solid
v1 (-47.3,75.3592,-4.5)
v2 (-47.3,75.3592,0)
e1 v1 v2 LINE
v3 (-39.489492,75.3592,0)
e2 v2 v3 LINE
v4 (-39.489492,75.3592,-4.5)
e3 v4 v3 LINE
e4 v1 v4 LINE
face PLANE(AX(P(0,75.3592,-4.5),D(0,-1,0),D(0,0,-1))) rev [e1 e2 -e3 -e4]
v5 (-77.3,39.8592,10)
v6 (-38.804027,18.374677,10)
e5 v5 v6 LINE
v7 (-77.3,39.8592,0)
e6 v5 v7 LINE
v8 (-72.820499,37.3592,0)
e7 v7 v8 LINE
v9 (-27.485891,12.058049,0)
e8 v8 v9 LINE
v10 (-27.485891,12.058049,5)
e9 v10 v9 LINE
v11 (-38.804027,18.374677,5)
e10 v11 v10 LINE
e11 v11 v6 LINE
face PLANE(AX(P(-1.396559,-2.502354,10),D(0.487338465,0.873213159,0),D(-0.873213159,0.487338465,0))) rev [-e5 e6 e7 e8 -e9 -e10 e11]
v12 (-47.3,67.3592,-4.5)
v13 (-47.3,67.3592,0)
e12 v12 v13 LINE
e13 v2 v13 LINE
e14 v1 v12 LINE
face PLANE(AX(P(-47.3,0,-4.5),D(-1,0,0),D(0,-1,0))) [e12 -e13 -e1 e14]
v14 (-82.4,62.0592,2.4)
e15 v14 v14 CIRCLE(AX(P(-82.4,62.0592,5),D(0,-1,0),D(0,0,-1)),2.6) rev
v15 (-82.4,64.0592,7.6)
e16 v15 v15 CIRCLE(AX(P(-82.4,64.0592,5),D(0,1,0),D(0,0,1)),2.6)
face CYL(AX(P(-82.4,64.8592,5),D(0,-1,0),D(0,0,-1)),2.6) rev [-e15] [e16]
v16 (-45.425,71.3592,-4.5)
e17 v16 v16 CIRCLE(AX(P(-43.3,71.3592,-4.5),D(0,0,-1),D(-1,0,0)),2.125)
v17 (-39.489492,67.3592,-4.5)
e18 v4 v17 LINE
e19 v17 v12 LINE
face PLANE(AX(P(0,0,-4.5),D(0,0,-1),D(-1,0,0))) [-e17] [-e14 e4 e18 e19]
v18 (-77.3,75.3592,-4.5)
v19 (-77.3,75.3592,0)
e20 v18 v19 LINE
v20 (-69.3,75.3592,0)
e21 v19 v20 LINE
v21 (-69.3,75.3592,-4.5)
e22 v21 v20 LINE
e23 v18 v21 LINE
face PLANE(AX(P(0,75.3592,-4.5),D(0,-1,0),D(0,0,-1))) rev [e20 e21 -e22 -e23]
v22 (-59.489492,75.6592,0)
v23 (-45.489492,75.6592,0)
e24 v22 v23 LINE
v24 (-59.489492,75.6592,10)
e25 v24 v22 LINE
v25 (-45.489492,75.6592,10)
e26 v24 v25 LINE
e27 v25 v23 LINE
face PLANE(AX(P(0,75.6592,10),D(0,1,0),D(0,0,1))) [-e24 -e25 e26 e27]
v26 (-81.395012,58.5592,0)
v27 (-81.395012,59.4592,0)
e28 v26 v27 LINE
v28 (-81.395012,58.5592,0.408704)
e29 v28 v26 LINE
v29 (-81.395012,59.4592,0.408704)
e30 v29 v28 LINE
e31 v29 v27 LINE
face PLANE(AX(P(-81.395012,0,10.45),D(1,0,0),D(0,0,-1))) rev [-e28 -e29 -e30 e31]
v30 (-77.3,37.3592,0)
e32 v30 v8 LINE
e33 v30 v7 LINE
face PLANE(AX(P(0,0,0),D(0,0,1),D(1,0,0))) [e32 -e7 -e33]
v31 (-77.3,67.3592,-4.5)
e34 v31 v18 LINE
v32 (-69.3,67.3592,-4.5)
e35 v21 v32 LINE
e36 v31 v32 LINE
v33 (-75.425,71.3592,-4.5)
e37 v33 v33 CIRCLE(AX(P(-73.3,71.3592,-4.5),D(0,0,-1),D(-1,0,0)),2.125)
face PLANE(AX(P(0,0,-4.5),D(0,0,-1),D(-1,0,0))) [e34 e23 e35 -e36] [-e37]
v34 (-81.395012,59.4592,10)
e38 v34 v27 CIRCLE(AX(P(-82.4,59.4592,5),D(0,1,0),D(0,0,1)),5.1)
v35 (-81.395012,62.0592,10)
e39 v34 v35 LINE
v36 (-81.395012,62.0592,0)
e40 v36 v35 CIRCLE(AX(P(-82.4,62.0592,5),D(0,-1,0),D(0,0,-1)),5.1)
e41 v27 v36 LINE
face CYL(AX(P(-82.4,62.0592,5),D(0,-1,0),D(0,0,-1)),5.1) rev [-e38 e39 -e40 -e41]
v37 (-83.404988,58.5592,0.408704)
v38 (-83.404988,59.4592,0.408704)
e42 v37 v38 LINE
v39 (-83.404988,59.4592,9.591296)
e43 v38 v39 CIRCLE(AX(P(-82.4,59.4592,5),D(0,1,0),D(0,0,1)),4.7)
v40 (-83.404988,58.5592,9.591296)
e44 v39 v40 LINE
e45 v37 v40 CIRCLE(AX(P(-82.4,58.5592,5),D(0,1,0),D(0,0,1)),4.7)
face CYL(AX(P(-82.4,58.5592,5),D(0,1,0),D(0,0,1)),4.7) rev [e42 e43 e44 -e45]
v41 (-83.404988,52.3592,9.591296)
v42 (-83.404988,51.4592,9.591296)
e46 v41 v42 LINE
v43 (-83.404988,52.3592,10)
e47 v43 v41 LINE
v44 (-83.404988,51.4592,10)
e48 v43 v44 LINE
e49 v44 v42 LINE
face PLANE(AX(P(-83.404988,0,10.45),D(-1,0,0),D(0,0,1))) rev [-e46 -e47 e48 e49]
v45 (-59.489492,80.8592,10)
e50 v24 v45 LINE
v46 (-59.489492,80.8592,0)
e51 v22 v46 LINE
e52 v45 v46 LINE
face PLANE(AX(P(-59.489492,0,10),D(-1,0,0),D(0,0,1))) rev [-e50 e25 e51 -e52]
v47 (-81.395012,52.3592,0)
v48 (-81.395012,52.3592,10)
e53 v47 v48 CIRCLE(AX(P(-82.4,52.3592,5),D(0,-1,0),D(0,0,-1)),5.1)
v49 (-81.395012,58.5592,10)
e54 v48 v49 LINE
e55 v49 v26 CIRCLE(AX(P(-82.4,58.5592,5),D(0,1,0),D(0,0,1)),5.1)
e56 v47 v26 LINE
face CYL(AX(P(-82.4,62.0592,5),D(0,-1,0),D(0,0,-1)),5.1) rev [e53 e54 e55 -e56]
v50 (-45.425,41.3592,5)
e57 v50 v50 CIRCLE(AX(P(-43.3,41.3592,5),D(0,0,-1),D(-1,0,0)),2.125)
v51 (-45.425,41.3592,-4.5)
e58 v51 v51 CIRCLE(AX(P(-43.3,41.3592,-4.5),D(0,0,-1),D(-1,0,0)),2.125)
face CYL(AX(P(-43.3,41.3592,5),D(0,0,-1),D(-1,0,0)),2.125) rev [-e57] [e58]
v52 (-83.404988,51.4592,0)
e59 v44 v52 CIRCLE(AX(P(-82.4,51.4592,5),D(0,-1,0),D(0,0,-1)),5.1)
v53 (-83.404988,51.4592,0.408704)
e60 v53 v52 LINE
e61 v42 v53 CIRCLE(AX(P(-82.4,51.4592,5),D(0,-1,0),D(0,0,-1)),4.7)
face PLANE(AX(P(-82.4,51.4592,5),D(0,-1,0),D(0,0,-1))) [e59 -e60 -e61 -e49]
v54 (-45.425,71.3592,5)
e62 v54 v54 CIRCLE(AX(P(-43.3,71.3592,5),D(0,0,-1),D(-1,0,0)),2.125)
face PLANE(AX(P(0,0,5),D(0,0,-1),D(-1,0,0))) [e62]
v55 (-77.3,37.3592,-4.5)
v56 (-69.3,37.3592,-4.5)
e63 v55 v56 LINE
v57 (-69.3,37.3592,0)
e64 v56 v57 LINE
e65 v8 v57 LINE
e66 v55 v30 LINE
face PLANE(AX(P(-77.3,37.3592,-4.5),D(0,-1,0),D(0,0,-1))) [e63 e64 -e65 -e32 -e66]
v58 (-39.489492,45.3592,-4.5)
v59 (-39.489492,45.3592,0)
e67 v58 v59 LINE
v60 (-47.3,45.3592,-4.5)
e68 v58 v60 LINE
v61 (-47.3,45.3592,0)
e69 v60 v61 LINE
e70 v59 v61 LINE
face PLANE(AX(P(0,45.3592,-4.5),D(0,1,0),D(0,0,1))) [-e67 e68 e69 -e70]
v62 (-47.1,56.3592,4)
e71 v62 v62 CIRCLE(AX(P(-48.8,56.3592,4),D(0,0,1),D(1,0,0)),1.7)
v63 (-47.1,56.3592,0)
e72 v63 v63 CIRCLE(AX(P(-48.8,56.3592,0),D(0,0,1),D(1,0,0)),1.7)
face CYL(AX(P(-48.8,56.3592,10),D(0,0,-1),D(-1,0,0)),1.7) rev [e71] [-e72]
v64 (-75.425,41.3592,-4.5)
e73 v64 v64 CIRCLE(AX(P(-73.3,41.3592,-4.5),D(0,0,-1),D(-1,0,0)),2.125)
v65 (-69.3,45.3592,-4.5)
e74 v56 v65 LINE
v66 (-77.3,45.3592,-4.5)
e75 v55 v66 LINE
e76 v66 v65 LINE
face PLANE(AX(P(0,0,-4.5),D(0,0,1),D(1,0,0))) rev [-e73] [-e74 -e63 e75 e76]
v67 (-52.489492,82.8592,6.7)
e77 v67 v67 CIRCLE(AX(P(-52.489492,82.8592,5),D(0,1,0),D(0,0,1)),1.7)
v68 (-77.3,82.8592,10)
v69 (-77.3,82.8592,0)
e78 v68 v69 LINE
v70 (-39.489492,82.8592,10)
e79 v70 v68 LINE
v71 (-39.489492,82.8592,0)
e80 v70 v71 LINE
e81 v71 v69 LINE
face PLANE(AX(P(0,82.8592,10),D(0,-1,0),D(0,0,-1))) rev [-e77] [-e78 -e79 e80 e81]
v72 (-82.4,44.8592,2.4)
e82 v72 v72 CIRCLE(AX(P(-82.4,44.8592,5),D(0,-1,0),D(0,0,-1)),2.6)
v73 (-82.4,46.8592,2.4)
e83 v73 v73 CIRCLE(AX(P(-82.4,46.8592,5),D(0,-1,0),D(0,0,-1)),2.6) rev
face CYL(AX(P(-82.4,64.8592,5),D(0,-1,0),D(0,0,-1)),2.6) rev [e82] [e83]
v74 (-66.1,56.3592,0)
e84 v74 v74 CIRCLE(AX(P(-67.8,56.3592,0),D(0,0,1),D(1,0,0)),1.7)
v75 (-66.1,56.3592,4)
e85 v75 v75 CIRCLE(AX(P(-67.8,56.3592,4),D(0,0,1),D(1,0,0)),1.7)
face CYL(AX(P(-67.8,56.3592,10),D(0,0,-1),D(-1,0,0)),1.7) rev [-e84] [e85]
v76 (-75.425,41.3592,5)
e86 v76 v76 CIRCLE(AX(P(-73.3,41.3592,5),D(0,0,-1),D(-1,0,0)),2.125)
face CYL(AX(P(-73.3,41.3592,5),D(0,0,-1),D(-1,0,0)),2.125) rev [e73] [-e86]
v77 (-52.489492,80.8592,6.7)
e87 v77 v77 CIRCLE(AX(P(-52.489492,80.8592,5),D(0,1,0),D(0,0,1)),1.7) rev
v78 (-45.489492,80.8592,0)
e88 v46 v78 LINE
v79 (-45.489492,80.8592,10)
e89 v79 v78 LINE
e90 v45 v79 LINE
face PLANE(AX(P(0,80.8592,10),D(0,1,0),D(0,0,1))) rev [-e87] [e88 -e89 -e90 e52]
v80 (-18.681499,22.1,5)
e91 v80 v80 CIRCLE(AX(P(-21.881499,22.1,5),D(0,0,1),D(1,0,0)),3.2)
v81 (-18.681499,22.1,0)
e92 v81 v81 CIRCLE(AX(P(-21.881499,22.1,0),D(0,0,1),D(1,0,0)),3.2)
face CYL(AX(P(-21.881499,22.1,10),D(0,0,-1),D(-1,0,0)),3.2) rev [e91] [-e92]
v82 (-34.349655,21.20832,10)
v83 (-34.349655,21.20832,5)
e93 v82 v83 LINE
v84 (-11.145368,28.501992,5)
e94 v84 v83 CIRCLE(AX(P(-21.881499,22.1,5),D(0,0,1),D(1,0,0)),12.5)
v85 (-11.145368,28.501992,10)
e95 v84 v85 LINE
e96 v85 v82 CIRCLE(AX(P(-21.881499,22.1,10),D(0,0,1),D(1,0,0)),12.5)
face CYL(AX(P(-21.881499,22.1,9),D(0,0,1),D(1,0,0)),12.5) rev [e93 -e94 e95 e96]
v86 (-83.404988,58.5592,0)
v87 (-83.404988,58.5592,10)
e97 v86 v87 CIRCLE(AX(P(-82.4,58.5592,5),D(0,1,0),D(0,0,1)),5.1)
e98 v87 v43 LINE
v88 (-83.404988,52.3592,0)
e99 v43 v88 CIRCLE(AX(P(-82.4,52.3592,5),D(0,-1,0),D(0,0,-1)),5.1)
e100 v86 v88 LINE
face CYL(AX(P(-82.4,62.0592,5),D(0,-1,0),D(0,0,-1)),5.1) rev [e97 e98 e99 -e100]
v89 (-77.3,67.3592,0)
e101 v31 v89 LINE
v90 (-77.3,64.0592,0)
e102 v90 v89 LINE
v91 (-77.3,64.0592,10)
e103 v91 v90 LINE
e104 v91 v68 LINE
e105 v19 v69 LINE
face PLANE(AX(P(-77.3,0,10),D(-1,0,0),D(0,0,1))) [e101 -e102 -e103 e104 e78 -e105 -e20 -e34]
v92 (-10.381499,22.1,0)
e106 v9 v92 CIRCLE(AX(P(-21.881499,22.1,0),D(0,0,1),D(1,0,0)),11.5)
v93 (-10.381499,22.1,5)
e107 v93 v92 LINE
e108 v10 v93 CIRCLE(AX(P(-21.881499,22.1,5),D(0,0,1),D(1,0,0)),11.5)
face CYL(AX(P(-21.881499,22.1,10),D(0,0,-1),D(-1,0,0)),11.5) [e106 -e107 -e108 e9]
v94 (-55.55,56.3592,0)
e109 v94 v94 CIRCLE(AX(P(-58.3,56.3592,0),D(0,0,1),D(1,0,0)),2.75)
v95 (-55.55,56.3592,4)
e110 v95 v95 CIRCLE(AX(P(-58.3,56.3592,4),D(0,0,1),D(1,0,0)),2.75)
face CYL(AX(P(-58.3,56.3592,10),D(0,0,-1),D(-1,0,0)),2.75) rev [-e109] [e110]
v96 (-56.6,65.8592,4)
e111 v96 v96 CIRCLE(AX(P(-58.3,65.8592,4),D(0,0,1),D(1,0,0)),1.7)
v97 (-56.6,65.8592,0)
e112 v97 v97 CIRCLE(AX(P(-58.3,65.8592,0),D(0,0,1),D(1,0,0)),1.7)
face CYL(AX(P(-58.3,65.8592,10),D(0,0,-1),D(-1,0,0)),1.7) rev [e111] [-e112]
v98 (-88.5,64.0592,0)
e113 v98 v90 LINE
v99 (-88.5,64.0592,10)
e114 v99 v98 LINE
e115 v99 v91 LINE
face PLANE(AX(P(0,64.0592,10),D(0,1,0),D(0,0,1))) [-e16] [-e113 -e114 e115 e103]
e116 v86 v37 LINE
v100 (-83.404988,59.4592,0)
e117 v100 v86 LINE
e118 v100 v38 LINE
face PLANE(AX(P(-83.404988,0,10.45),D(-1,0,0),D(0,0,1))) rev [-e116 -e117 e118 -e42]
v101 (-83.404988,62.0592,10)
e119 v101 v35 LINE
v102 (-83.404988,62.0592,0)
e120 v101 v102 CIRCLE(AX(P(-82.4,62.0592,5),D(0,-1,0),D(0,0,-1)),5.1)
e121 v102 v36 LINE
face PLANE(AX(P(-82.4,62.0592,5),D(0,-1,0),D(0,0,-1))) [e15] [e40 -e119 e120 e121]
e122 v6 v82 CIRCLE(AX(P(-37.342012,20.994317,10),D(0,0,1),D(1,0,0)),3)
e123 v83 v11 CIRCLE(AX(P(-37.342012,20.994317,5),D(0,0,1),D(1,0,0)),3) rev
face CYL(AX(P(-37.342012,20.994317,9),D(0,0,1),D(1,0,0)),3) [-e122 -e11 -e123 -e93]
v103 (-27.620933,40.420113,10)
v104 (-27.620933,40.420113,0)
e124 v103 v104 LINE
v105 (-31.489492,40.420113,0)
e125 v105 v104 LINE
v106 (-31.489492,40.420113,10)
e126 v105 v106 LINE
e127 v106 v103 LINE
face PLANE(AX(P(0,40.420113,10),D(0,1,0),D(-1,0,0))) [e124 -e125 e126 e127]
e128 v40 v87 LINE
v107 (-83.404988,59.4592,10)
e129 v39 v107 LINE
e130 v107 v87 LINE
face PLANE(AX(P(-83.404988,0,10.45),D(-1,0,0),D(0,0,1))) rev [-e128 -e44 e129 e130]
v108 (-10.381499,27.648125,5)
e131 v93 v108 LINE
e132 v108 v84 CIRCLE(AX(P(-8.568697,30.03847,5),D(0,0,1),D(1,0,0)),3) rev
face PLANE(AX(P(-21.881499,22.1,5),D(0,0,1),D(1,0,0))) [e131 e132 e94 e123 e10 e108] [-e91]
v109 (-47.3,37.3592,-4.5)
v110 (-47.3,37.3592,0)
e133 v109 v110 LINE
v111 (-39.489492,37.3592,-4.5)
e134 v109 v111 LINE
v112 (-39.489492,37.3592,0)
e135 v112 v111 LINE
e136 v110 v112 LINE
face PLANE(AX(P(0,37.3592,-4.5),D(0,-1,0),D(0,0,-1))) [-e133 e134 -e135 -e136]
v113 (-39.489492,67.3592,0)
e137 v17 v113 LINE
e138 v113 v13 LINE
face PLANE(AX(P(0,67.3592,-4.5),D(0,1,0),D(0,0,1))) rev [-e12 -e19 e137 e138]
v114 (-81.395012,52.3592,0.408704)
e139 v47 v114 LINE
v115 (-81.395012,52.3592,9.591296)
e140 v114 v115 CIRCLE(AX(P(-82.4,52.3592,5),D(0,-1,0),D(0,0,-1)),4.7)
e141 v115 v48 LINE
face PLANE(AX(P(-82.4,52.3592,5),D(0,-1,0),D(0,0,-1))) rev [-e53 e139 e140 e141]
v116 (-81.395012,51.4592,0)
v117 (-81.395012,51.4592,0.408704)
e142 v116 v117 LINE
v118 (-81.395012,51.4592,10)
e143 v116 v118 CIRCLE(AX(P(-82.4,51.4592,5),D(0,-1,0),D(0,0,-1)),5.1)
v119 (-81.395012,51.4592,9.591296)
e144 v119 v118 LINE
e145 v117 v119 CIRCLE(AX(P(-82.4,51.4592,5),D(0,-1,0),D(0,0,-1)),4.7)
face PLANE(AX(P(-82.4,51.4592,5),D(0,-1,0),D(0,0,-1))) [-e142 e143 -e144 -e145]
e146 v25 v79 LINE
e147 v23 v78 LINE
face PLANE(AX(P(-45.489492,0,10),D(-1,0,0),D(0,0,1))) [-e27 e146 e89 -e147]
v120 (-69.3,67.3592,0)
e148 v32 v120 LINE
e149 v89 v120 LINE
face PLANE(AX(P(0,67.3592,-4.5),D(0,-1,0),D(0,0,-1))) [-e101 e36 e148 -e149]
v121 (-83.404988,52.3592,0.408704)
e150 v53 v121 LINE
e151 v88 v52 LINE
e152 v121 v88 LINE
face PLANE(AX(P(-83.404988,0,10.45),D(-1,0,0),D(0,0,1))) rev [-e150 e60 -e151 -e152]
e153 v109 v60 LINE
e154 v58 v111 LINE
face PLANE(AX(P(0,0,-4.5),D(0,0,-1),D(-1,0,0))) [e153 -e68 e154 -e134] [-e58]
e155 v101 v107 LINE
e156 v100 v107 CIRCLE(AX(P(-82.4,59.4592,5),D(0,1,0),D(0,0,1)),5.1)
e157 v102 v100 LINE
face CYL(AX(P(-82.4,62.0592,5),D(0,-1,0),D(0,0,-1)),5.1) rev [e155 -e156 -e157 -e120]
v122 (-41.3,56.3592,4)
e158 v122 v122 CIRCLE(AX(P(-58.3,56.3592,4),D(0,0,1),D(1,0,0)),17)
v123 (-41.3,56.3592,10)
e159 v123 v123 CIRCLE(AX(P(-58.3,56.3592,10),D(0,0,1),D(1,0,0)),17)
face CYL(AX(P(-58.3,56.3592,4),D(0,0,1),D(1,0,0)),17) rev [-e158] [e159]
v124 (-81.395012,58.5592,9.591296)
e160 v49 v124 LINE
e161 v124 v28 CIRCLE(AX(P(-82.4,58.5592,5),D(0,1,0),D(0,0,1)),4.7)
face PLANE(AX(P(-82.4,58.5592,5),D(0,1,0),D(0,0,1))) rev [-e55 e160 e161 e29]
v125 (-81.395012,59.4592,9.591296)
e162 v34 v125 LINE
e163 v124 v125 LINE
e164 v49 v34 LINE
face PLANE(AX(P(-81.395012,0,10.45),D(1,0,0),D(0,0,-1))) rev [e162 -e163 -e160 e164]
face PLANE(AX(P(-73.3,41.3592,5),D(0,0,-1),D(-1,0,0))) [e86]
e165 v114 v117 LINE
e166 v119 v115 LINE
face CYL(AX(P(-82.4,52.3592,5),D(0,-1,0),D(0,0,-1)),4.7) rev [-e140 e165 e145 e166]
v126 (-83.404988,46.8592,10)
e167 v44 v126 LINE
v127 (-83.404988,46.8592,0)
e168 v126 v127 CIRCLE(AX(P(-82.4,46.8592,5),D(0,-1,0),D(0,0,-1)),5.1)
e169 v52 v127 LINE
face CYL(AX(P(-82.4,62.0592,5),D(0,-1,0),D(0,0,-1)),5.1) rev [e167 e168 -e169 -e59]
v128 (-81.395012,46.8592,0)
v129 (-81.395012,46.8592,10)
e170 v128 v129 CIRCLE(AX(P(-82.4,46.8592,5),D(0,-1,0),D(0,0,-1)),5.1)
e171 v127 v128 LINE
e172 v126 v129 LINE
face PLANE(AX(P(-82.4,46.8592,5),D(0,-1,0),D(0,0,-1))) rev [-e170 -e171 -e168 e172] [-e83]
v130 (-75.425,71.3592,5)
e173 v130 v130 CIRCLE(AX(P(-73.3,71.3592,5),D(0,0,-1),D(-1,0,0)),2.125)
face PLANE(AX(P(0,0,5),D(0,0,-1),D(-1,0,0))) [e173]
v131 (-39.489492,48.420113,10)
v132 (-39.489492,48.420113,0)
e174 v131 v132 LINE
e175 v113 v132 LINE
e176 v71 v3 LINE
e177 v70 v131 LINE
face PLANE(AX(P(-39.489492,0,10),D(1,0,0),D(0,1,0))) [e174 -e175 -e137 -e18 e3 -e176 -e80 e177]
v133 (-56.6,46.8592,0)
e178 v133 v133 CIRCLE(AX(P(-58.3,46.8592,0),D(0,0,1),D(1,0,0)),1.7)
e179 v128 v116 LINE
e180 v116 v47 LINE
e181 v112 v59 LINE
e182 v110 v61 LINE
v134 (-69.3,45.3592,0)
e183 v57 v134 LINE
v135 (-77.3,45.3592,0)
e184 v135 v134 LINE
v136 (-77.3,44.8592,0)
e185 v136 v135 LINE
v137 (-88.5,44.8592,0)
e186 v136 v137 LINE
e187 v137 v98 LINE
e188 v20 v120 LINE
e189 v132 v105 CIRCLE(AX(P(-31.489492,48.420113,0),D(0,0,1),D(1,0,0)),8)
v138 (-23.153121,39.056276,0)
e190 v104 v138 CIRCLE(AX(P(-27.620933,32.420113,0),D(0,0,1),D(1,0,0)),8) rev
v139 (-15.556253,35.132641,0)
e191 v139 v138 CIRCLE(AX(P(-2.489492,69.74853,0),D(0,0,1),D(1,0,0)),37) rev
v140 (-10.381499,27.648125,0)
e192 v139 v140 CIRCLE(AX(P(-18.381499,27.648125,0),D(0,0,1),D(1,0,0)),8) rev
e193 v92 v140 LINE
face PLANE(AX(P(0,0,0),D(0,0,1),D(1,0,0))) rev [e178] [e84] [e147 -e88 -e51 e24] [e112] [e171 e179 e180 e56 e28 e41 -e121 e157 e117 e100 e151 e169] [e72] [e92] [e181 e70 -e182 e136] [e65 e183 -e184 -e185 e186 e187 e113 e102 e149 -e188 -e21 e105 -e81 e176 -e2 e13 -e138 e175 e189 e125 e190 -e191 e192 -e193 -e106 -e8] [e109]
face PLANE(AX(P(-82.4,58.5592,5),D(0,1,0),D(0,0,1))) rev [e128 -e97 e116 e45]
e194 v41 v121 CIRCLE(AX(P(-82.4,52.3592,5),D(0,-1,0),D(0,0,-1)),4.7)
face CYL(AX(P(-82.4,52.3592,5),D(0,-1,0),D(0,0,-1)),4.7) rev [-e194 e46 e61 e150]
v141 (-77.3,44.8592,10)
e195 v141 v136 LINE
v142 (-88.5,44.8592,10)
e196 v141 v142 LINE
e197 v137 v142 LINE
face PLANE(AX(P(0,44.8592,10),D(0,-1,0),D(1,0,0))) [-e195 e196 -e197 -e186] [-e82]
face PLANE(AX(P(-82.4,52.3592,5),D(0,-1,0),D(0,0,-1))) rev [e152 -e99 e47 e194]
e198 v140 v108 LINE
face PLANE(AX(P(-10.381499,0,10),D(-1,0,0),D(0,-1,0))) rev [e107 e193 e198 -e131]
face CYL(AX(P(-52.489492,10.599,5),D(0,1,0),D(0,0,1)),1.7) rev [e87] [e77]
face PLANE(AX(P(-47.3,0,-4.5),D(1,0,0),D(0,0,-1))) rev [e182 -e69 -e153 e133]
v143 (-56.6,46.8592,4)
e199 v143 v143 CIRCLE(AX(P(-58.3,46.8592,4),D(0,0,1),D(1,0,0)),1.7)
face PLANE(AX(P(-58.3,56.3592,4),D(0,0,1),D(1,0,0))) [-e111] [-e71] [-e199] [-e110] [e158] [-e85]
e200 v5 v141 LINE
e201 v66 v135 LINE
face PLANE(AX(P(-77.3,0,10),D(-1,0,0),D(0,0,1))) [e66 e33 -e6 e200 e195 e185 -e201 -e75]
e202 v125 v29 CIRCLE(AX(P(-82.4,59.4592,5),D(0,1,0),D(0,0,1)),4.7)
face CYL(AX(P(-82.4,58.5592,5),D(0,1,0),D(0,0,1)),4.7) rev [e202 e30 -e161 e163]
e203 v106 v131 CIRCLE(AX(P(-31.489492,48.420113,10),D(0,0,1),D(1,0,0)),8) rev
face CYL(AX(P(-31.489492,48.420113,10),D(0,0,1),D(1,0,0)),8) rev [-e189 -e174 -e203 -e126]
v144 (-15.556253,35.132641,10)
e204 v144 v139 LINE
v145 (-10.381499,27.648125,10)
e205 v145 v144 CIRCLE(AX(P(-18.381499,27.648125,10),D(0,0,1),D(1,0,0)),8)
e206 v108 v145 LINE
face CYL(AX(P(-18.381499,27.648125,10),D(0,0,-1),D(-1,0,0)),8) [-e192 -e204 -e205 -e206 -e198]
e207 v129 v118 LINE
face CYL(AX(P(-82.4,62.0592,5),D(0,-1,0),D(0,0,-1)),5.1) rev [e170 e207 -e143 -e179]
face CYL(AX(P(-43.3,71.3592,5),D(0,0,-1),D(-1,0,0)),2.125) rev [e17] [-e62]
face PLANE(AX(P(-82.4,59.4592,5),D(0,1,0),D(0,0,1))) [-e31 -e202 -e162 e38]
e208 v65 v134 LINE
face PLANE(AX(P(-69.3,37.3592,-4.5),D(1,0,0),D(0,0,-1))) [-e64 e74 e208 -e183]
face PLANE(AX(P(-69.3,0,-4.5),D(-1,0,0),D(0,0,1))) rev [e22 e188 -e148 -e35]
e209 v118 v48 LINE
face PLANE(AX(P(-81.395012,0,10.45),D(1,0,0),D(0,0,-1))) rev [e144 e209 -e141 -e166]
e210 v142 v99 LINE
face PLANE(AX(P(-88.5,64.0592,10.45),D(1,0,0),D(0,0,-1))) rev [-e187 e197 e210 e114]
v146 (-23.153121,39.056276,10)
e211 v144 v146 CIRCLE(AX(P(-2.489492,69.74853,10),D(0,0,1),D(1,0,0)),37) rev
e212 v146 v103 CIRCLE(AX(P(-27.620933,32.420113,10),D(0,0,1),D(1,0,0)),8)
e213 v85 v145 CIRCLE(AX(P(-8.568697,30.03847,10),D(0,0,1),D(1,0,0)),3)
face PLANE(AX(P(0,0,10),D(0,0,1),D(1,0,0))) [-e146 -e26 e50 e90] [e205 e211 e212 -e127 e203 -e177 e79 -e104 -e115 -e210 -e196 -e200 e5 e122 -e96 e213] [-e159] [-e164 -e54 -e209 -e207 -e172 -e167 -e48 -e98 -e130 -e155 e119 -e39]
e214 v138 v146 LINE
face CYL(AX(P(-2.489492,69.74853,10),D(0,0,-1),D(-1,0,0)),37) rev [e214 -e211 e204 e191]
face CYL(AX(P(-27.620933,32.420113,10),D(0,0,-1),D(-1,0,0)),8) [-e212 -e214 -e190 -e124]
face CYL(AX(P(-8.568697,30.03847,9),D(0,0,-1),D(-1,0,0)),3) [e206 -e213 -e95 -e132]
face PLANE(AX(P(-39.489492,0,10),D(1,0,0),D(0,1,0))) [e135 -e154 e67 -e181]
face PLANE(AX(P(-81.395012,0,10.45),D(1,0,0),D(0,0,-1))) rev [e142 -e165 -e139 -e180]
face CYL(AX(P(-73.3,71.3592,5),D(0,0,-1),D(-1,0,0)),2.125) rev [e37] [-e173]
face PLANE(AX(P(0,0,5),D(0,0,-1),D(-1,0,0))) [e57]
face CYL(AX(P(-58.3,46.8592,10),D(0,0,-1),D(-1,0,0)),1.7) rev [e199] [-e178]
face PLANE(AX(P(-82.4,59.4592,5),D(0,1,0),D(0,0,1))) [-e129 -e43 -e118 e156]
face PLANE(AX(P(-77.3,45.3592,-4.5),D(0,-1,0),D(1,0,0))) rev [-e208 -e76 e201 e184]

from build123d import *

# Parameters (mm, degrees)
SKETCH1_W                 = 5.2
SKETCH1_H                 = 14
SKETCH1_R                 = 3.2
SKETCH1_R_2               = 1.7
SKETCH1_R_3               = 2.75
BOSS_EXTRUDE1_DEPTH       = 10
SKETCH2_R                 = 2.6
CUT_EXTRUDE1_DEPTH        = 20
SKETCH3_R                 = 5.1
CUT_EXTRUDE2_DEPTH        = 15.2
BOSS_EXTRUDE2_DEPTH       = 0.45
BOSS_EXTRUDE2_DEPTH_BACK  = 0.45
SKETCH4_R                 = 5.1
SKETCH4_R_2               = 4.7
BOSS_EXTRUDE3_DEPTH       = 0.45
BOSS_EXTRUDE3_DEPTH_BACK  = 0.45
SKETCH5_R                 = 5.1
SKETCH5_R_2               = 4.7
CUT_EXTRUDE3_START        = -11
CUT_EXTRUDE3_OUTLINE_W    = 2.009975124
CUT_EXTRUDE3_OUTLINE_H    = 0.9
CUT_EXTRUDE3_OUTLINE_W_2  = 3
CUT_EXTRUDE3_OUTLINE_H_2  = 19.2
CUT_EXTRUDE3_DEPTH        = 12
SKETCH7_R                 = 12.5
CUT_EXTRUDE4_DEPTH        = 1
SKETCH8_R                 = 9.6
CUT_EXTRUDE5_DEPTH        = 1
SKETCH11_R                = 17
CUT_EXTRUDE6_DEPTH        = 6
BOSS_EXTRUDE4_OUTLINE_W   = 7.810507711
BOSS_EXTRUDE4_OUTLINE_H   = 8
BOSS_EXTRUDE4_OUTLINE_W_2 = 8
BOSS_EXTRUDE4_DEPTH       = 4.5
SKETCH13_R                = 2.125
CUT_EXTRUDE7_DEPTH        = 9.5
SKETCH16_W                = 0.189492289
SKETCH16_H                = 3.060913179
CUT_EXTRUDE8_DEPTH        = 4.5
FILLET1_R                 = 8
SKETCH19_R                = 12.5
CUT_EXTRUDE9_DEPTH        = 5
FILLET3_R                 = 3
CUT_EXTRUDE10_REACH       = 116.689
SKETCH20_R                = 1.7


with BuildPart() as part:
    # Sketch1 → Boss-Extrude1 (new body)
    with BuildSketch(Plane(origin=(0, 0, 0), x_dir=(0, 1, 0), z_dir=(0, 0, 1))):
        with BuildLine():
            Line((44.859200041, 91.5), (44.859200041, 77.3))
            Line((44.859200041, 77.3), (39.859200041, 77.3))
            Line((39.859200041, 77.3), (12.058048672, 27.485891377))
            ThreePointArc((12.058048672, 27.485891377), (12.182830244, 16.059150365), (22.1, 10.381499035))
            Line((22.1, 10.381499035), (33.6, 10.381499035))
            ThreePointArc((33.6, 10.381499035), (36.198905176, 18.091500699), (40.42011322, 25.047062246))
            Line((40.42011322, 25.047062246), (40.42011322, 39.489492289))
            Line((40.42011322, 39.489492289), (82.859200041, 39.489492289))
            Line((82.859200041, 39.489492289), (82.859200041, 77.3))
            Line((82.859200041, 77.3), (64.059200041, 77.3))
            Line((64.059200041, 77.3), (64.059200041, 91.5))
            Line((64.059200041, 91.5), (44.859200041, 91.5))
        make_face()
        with Locations((78.259200041, 52.489492289)):
            Rectangle(SKETCH1_W, SKETCH1_H, mode=Mode.SUBTRACT)
        with Locations(Location((22.1, 21.881499035, 0), (0, 0, 270))):
            Circle(SKETCH1_R, mode=Mode.SUBTRACT)
        with Locations(Location((65.859200041, 58.3, 0), (0, 0, 270))):
            Circle(SKETCH1_R_2, mode=Mode.SUBTRACT)
        with Locations(Location((56.359200041, 48.8, 0), (0, 0, 270))):
            Circle(SKETCH1_R_2, mode=Mode.SUBTRACT)
        with Locations(Location((46.859200041, 58.3, 0), (0, 0, 270))):
            Circle(SKETCH1_R_2, mode=Mode.SUBTRACT)
        with Locations(Location((56.359200041, 58.3, 0), (0, 0, 270))):
            Circle(SKETCH1_R_3, mode=Mode.SUBTRACT)
        with Locations(Location((56.359200041, 67.8, 0), (0, 0, 270))):
            Circle(SKETCH1_R_2, mode=Mode.SUBTRACT)
    extrude(amount=BOSS_EXTRUDE1_DEPTH)

    # Sketch2 → Cut-Extrude1 (cut)
    with BuildSketch(Plane.XZ.offset(-44.859200041)):
        with Locations(Location((-82.4, 5, 0), (0, 0, 270))):
            Circle(SKETCH2_R)
    extrude(amount=-CUT_EXTRUDE1_DEPTH, mode=Mode.SUBTRACT)

    # Sketch3 → Cut-Extrude2 (cut)
    with BuildSketch(Plane(origin=(0, 46.859200041, 0), x_dir=(-1, 0, 0), z_dir=(0, -1, 0))):
        with Locations((82.4, -5)):
            Circle(SKETCH3_R)
    extrude(amount=-CUT_EXTRUDE2_DEPTH, mode=Mode.SUBTRACT)

    # Sketch4 → Boss-Extrude2 (add, two sides: drawn at the far end of the back side and taken through both)
    with BuildSketch(Plane(origin=(0, 51.909200041, 0), x_dir=(-1, 0, 0), z_dir=(0, -1, 0)).offset(-BOSS_EXTRUDE2_DEPTH_BACK)):
        with Locations((82.4, -5)):
            Circle(SKETCH4_R)
        with Locations(Location((82.4, -5, 0), (0, 0, 90))):
            Circle(SKETCH4_R_2, mode=Mode.SUBTRACT)
    extrude(amount=BOSS_EXTRUDE2_DEPTH + BOSS_EXTRUDE2_DEPTH_BACK)

    # Sketch5 → Boss-Extrude3 (add, two sides: drawn at the far end of the back side and taken through both)
    with BuildSketch(Plane(origin=(0, 59.009200041, 0), x_dir=(1, 0, 0), z_dir=(0, 1, 0)).offset(-BOSS_EXTRUDE3_DEPTH_BACK)):
        with Locations((-82.4, -5)):
            Circle(SKETCH5_R)
        with Locations(Location((-82.4, -5, 0), (0, 0, 90))):
            Circle(SKETCH5_R_2, mode=Mode.SUBTRACT)
    extrude(amount=BOSS_EXTRUDE3_DEPTH + BOSS_EXTRUDE3_DEPTH_BACK)

    # Cut-Extrude3: read off the stored shape, not the designer's step
    # Cut-Extrude3 outline → Cut-Extrude3 (cut)
    with BuildSketch(Plane.XY.offset(10).offset(CUT_EXTRUDE3_START)):
        with Locations((-82.4, 59.009200041)):
            Rectangle(CUT_EXTRUDE3_OUTLINE_W, CUT_EXTRUDE3_OUTLINE_H)
        with Locations((-82.4, 51.909200041)):
            Rectangle(CUT_EXTRUDE3_OUTLINE_W, CUT_EXTRUDE3_OUTLINE_H)
        with Locations((-90, 54.459200041)):
            Rectangle(CUT_EXTRUDE3_OUTLINE_W_2, CUT_EXTRUDE3_OUTLINE_H_2)
    extrude(amount=CUT_EXTRUDE3_DEPTH, mode=Mode.SUBTRACT)

    # Sketch7 → Cut-Extrude4 (cut)
    with BuildSketch(Plane.XY.offset(10)):
        with Locations((-21.881499035, 22.1)):
            Circle(SKETCH7_R)
    extrude(amount=-CUT_EXTRUDE4_DEPTH, mode=Mode.SUBTRACT)

    # Sketch8 → Cut-Extrude5 (cut)
    with BuildSketch(Plane.XY.offset(9)):
        with Locations((-21.881499035, 22.1)):
            Circle(SKETCH8_R)
    extrude(amount=-CUT_EXTRUDE5_DEPTH, mode=Mode.SUBTRACT)

    # Sketch11 → Cut-Extrude6 (cut)
    with BuildSketch(Plane.XY.offset(10)):
        with Locations((-58.3, 56.359200041)):
            Circle(SKETCH11_R)
    extrude(amount=-CUT_EXTRUDE6_DEPTH, mode=Mode.SUBTRACT)

    # Boss-Extrude4: read off the stored shape, not the designer's step
    # Boss-Extrude4 outline → Boss-Extrude4 (add)
    with BuildSketch(Plane(origin=(0, 0, 0), x_dir=(1, 0, 0), z_dir=(0, 0, -1))):
        with Locations((-43.394746145, -71.359200041)):
            Rectangle(BOSS_EXTRUDE4_OUTLINE_W, BOSS_EXTRUDE4_OUTLINE_H)
        Polygon((-47.3, -45.359200041), (-39.489492289, -45.359200041), (-39.489492289, -40.42011322), (-39.3, -40.42011322), (-39.3, -37.359200041), (-47.3, -37.359200041), align=None)
        with Locations((-73.3, -71.359200041)):
            Rectangle(BOSS_EXTRUDE4_OUTLINE_W_2, BOSS_EXTRUDE4_OUTLINE_H)
        with Locations((-73.3, -41.359200041)):
            Rectangle(BOSS_EXTRUDE4_OUTLINE_W_2, BOSS_EXTRUDE4_OUTLINE_H)
    extrude(amount=BOSS_EXTRUDE4_DEPTH)

    # Sketch13 → Cut-Extrude7 (cut)
    with BuildSketch(Plane(origin=(0, 0, -4.5), x_dir=(1, 0, 0), z_dir=(0, 0, -1))):
        with Locations(Location((-43.3, -41.359200041, 0), (0, 0, 180))):
            Circle(SKETCH13_R)
        with Locations(Location((-43.3, -71.359200041, 0), (0, 0, 180))):
            Circle(SKETCH13_R)
        with Locations(Location((-73.3, -71.359200041, 0), (0, 0, 180))):
            Circle(SKETCH13_R)
        with Locations(Location((-73.3, -41.359200041, 0), (0, 0, 180))):
            Circle(SKETCH13_R)
    extrude(amount=-CUT_EXTRUDE7_DEPTH, mode=Mode.SUBTRACT)

    # Sketch16 → Cut-Extrude8 (cut)
    with BuildSketch(Plane(origin=(0, 0, -4.5), x_dir=(1, 0, 0), z_dir=(0, 0, -1))):
        with Locations((-39.394746145, -38.88965663)):
            Rectangle(SKETCH16_W, SKETCH16_H)
    extrude(amount=-CUT_EXTRUDE8_DEPTH, mode=Mode.SUBTRACT)

    # Fillet1
    # the kernel refuses this fillet: 8 mm, written as the material it adds along each edge
    with BuildSketch(Plane(origin=(-39.489492289, 40.42011322, 0), x_dir=(0, 1, 0), z_dir=(0, 0, 1))) as fillet1_piece_1:
        with BuildLine():
            CenterArc((FILLET1_R, -FILLET1_R), FILLET1_R, 90, 90)
            Line((0, -FILLET1_R), (0, 0))
            Line((0, 0), (FILLET1_R, 0))
        make_face()
    extrude(amount=10)
    # the kernel refuses this fillet: 8 mm, written as the material it takes off along each edge
    with BuildSketch(Plane(origin=(-25.047062246, 40.42011322, -6.434675881), x_dir=(-1, 0, 0), z_dir=(0, 0, 1))) as fillet1_2_piece_1:
        with BuildLine():
            CenterArc((2.573870352, 8), FILLET1_R, 236.049500449, 33.950499551)
            ThreePointArc((-1.893941258, 1.363836996), (-0.936214399, 0.696855523), (0, 0))
            Line((0, 0), (2.573870352, 0))
        make_face()
    extrude(amount=22.869351762, mode=Mode.SUBTRACT)
    with BuildSketch(Plane(origin=(-10.381499035, 33.6, -14.879687817), x_dir=(-0.9588293573098585, 0.2839828578642794, 0), z_dir=(0, 0, 1))) as fillet1_2_piece_2:
        with BuildLine():
            CenterArc((5.98040435, 7.978695466), FILLET1_R, 196.498058708, 69.319545905)
            Line((-1.690230508, 5.706832603), (0, 0))
            ThreePointArc((0, 0), (2.698475134, 0.098533472), (5.396950267, 0))
        make_face()
    extrude(amount=39.759375634, mode=Mode.SUBTRACT)

    # Sketch19 → Cut-Extrude9 (cut)
    with BuildSketch(Plane.XY.offset(10)):
        with Locations((-21.881499035, 22.1)):
            Circle(SKETCH19_R)
    extrude(amount=-CUT_EXTRUDE9_DEPTH, mode=Mode.SUBTRACT)

    # Fillet3
    # the kernel refuses this fillet: 3 mm, written as the material it takes off along each edge
    with BuildSketch(Plane(origin=(-10.381499035, 26.998979486, 14.214960222), x_dir=(9.684312598090364e-12, 1.0, -1.847411112972132e-14), z_dir=(0, 0, -1))) as fillet3_piece_1:
        with BuildLine():
            CenterArc((3.039490322, 1.812802001), FILLET3_R, 217.17613817, 22.016092035)
            ThreePointArc((1.503012295, -0.763869354), (0.76439954, -0.356565251), (0, 0))
            Line((0, 0), (0.649145388, 0))
        make_face()
    extrude(amount=9.214960222, mode=Mode.SUBTRACT)
    with BuildSketch(Plane(origin=(-31.763744729, 14.445509812, 5), x_dir=(-0.35715309500497466, 0.9340458590071301, -7.501643631045315e-14), z_dir=(0, 0, 1))) as fillet3_piece_2:
        with BuildLine():
            CenterArc((8.109181309, 2.871430927), FILLET3_R, 129.90874339, 123.256431286)
            Line((6.184481226, 5.172632698), (0, 0))
            ThreePointArc((0, 0), (3.620170227, 0.53570447), (7.240340454, 0))
        make_face()
    extrude(amount=25.156254778, mode=Mode.SUBTRACT)

    # Sketch20 → Cut-Extrude10 (cut, up to next)
    with BuildSketch(Plane(origin=(0, 82.859200041, 0), x_dir=(-1, 0, 0), z_dir=(0, 1, 0)), mode=Mode.PRIVATE) as cut_extrude10_sk1:
        with Locations(Location((52.489492289, 5, 0), (0, 0, 90))):
            Circle(SKETCH20_R)
    cut_extrude10_tool1 = extrude(cut_extrude10_sk1.sketch, amount=-CUT_EXTRUDE10_REACH, mode=Mode.PRIVATE) & part.part
    add(cut_extrude10_tool1.solids().sort_by_distance((-52.489492, 82.8592, 5))[0], mode=Mode.SUBTRACT)


solid = part.part
